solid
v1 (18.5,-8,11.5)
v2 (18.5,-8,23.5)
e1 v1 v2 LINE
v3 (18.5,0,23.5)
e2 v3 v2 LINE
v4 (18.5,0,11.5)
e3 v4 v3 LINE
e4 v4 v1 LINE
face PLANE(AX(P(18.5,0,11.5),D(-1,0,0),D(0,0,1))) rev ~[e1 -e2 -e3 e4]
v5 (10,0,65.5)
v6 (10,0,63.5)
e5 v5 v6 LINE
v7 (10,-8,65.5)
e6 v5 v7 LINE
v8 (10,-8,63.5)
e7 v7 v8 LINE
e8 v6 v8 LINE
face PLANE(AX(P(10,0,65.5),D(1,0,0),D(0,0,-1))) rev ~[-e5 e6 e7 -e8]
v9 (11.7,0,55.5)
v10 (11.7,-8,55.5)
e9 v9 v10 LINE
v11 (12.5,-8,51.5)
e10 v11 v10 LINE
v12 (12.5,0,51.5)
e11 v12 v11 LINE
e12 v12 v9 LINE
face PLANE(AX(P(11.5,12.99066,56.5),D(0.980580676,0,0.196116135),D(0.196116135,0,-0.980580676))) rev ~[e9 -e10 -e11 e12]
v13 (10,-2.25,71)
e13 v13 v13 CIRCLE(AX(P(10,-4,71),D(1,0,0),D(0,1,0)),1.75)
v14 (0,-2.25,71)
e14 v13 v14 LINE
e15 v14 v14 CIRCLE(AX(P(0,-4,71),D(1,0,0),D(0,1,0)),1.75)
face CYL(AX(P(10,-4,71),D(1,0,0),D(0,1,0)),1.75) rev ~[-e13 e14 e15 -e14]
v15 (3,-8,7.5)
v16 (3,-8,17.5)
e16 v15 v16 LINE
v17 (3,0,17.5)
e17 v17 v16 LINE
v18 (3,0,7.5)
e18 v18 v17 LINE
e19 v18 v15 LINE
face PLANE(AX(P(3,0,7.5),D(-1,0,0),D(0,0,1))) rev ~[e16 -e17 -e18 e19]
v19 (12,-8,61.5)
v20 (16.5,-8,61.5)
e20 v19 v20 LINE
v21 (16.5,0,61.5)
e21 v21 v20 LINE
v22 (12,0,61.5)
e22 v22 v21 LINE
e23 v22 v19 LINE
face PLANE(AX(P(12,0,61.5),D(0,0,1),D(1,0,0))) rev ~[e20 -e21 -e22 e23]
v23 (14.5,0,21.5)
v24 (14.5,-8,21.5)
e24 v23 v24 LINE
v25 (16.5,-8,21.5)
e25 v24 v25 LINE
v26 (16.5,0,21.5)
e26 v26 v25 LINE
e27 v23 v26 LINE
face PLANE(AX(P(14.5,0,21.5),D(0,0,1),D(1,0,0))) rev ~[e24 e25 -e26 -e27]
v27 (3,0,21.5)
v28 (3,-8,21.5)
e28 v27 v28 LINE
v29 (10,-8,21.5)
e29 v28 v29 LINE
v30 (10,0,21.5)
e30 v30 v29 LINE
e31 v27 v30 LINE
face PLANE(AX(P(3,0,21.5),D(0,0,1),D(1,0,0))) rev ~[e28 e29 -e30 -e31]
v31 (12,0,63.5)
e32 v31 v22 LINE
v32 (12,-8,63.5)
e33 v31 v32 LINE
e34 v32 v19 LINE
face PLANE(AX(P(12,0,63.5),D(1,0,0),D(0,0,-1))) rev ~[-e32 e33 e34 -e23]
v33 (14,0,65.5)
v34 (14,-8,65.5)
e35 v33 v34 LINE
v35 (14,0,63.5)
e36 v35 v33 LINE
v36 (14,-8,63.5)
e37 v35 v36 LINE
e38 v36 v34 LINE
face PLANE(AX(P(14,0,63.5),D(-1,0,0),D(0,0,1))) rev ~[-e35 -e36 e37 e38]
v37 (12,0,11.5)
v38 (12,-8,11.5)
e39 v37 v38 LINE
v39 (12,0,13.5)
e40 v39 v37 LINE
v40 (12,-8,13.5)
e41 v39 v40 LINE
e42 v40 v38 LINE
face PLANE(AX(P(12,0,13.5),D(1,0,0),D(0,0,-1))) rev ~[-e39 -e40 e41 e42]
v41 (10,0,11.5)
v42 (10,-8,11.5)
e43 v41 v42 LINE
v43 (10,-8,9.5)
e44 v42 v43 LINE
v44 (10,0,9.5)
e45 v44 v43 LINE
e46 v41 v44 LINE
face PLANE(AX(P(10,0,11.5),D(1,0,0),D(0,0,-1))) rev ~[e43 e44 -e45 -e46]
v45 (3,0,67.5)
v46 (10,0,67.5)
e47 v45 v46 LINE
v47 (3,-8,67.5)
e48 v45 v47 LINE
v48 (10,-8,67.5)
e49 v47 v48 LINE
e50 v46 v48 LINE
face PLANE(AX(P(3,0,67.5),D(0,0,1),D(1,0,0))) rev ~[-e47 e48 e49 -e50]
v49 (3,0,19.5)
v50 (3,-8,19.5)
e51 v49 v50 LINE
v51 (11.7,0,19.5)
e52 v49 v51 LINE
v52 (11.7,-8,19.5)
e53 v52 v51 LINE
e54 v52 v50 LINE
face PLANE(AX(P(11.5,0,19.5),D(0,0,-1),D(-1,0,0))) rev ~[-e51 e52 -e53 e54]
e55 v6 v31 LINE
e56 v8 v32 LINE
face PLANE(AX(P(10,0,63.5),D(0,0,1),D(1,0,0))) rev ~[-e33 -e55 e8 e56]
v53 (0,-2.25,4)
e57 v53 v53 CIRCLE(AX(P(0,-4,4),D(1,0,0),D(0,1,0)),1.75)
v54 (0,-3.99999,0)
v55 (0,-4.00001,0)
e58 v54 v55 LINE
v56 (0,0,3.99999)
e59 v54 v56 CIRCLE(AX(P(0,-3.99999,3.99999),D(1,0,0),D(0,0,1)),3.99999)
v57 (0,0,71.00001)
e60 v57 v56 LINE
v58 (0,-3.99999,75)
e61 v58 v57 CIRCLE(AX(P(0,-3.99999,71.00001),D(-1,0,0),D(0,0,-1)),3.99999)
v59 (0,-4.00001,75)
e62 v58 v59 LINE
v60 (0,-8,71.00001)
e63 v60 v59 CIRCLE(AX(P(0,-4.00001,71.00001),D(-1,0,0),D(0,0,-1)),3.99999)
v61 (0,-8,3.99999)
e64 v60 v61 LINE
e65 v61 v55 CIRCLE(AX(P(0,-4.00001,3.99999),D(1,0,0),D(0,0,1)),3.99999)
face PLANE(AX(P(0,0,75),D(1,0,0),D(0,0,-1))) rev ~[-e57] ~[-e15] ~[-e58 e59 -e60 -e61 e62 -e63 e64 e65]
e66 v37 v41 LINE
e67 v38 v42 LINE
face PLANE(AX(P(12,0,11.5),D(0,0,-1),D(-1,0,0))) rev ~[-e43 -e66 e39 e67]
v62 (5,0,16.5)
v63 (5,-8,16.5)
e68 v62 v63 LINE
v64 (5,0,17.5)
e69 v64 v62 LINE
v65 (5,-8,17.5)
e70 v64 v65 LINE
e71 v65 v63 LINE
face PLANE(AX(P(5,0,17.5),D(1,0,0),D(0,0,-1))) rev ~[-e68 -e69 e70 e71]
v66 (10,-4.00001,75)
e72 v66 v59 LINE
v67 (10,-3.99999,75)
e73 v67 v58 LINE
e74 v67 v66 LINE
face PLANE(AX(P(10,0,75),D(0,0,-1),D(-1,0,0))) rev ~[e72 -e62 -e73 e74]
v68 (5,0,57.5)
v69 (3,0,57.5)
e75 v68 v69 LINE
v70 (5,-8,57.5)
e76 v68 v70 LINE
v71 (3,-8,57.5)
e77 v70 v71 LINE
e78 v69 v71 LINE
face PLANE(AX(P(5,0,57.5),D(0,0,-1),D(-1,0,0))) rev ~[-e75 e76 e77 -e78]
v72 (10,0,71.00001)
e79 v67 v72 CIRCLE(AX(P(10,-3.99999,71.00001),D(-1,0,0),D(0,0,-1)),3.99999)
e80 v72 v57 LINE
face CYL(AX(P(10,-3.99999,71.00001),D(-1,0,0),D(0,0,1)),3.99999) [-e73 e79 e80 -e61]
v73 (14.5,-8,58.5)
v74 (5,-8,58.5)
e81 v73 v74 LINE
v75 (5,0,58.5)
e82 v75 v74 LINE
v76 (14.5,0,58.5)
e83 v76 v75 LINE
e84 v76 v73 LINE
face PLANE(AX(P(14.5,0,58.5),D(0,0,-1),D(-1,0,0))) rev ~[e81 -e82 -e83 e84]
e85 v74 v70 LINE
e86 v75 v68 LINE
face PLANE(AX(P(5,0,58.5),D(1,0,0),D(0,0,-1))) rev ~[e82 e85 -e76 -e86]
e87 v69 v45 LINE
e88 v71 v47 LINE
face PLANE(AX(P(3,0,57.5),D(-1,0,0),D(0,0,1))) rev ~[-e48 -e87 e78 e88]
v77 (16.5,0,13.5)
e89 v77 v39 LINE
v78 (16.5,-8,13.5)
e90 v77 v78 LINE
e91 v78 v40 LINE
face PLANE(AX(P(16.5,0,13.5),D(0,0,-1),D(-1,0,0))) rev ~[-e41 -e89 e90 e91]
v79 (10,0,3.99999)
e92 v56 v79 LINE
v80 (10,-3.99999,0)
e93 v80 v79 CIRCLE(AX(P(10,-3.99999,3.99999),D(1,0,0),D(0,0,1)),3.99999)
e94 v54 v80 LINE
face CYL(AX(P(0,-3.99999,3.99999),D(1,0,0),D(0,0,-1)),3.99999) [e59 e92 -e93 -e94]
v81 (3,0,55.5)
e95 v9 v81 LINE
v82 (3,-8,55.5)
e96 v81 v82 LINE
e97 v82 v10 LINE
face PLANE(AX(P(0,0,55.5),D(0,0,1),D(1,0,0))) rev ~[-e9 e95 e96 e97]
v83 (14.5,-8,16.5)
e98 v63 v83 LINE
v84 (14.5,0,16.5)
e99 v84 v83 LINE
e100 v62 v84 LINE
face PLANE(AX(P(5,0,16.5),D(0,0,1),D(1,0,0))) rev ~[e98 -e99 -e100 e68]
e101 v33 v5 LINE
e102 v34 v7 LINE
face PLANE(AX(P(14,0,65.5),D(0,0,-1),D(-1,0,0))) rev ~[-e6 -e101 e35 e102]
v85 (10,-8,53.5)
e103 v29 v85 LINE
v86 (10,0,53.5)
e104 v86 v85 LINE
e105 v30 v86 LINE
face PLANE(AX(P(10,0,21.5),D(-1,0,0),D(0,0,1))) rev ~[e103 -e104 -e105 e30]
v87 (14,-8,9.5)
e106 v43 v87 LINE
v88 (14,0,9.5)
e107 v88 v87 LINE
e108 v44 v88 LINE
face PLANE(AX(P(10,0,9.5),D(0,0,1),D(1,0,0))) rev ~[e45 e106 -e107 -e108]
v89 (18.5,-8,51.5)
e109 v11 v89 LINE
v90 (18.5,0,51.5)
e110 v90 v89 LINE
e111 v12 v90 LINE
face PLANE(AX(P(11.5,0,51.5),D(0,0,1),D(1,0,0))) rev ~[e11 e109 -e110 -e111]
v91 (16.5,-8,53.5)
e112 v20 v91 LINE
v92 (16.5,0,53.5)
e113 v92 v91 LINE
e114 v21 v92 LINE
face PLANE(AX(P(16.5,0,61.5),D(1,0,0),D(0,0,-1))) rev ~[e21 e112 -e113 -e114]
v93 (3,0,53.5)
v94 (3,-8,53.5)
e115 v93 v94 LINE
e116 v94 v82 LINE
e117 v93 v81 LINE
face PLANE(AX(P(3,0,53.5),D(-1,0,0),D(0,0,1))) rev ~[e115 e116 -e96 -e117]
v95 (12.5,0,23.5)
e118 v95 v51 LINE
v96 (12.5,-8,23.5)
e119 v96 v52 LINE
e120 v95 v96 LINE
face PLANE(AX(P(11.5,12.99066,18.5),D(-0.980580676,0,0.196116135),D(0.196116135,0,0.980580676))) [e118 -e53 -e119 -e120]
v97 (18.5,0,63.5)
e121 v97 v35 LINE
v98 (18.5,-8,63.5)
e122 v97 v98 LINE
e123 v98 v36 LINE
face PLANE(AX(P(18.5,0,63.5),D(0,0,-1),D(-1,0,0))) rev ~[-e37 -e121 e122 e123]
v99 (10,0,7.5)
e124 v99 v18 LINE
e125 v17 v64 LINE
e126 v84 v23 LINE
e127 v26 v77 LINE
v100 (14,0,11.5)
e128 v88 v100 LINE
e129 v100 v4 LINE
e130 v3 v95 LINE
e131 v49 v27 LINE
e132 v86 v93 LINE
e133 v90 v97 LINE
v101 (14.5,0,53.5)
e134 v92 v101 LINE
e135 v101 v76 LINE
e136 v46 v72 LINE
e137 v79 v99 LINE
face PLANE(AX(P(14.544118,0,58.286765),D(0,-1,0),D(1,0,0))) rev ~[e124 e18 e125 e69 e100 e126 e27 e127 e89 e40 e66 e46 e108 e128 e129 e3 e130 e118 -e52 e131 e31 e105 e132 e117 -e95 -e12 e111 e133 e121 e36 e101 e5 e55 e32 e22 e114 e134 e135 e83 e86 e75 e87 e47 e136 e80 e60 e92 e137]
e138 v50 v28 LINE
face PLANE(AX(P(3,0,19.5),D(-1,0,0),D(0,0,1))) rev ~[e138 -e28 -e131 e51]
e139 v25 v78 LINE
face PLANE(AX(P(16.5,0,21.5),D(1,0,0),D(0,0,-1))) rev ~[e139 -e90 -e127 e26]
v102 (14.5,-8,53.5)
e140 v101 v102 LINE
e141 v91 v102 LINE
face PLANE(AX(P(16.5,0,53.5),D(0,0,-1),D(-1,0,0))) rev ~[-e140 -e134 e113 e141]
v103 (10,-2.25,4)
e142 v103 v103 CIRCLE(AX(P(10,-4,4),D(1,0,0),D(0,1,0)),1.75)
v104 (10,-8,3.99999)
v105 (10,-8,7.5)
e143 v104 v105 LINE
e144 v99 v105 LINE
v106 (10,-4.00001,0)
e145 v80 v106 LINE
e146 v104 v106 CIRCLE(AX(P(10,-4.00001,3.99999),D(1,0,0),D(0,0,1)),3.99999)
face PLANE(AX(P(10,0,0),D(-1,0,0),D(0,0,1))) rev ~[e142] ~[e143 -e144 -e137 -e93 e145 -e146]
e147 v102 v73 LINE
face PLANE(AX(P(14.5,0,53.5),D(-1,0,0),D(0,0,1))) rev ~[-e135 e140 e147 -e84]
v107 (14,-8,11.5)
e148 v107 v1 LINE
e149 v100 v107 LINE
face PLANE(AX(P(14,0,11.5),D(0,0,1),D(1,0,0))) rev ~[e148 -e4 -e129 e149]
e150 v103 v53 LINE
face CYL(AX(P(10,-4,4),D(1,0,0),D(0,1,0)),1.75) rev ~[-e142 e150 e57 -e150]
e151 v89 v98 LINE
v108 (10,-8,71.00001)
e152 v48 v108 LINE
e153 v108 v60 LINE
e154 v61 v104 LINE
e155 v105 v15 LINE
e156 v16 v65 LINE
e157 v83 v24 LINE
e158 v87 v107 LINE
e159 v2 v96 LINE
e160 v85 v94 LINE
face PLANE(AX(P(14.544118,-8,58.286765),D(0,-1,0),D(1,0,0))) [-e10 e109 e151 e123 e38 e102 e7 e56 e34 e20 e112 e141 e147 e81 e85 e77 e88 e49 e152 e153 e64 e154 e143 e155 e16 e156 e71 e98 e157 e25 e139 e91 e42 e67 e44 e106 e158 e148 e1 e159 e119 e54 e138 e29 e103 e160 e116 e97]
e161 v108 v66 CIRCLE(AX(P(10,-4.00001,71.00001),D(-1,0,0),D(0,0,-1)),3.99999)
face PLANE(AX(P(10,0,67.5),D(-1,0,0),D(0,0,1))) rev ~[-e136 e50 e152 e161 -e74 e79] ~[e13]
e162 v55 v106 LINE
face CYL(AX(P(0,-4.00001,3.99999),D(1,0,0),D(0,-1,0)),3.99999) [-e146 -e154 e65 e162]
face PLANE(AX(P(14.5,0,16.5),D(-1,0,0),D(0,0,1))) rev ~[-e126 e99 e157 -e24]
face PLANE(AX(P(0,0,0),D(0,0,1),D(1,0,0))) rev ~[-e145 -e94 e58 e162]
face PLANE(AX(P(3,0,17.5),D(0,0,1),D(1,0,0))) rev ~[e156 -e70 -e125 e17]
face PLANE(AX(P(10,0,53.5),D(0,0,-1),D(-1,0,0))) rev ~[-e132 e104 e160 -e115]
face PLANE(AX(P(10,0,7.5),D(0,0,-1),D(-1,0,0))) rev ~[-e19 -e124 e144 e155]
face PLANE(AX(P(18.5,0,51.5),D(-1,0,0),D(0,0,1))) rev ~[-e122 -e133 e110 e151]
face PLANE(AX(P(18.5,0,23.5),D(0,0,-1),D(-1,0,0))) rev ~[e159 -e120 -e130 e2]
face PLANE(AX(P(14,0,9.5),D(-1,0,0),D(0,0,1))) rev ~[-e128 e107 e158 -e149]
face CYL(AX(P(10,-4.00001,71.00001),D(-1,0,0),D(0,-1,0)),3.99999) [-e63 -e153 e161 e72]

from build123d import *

# Parameters (mm, degrees)
F1_DEPTH    = 8
F2_T4_DEPTH = 33.981320863
F3_T4_DEPTH = 33.981320863
F4_R        = 3.99999
F5_R        = 1.75
F6_DEPTH    = 10
F7_R        = 1.75
F8_DEPTH    = 10


# Not quite as in the source:
# - a fillet or chamfer that OpenCascade refuses, or shapes differently, is made with other operations: its cross-section is extruded or revolved along the edge and cut away or added
# - a fillet or chamfer is up to 0.001 mm smaller than in the source, because OpenCascade refuses the exact size


with BuildPart() as f1:
    # F0 (on Front) → F1 (new body)
    with BuildSketch(Plane.XZ):
        Polygon((14, 65.5), (10, 65.5), (10, 63.5), (12, 63.5), (12, 61.5), (16.5, 61.5), (16.5, 58.5), (16.5, 53.5), (14.5, 53.5), (14.5, 58.5), (10, 58.5), (10, 55.5), (11.5, 55.5), (11.5, 51.5), (18.5, 51.5), (18.5, 63.5), (14, 63.5), align=None)
        Polygon((10, 11.5), (10, 9.5), (14, 9.5), (14, 11.5), (18.5, 11.5), (18.5, 23.5), (11.5, 23.5), (11.5, 19.5), (10, 19.5), (10, 16.5), (14.5, 16.5), (14.5, 21.5), (16.5, 21.5), (16.5, 16.5), (16.5, 13.5), (12, 13.5), (12, 11.5), align=None)
        Polygon((0, 75), (0, 0), (10, 0), (10, 7.5), (3, 7.5), (3, 9.5), (3, 13.5), (3, 16.5), (3, 17.5), (5, 17.5), (5, 16.5), (10, 16.5), (10, 19.5), (3, 19.5), (3, 21.5), (10, 21.5), (10, 53.5), (3, 53.5), (3, 55.5), (10, 55.5), (10, 58.5), (5, 58.5), (5, 57.5), (3, 57.5), (3, 58.5), (3, 61.5), (3, 65.5), (3, 67.5), (10, 67.5), (10, 75), align=None)
    extrude(amount=F1_DEPTH)

    # F2: chamfer of 1 x 5 on 1 edges, made by hand


with BuildPart() as f2_tool2:
    # F2_s3 → F2_t4 (new body)
    with BuildSketch(Plane.XZ.offset(-12.9906604315)):
        Polygon((11.5, 56.5), (12.5, 51.5), (11.5, 51.5), align=None)
    extrude(amount=F2_T4_DEPTH)

    split(bisect_by=Plane.XY.offset(55.5), keep=Keep.BOTTOM)


with BuildPart() as f1_1:
    add(f1.part)

    # F2_t1: cut F2_tool2
    add(f2_tool2.part, mode=Mode.SUBTRACT)

    # F3: chamfer of 5 x 1 on 1 edges, made by hand


with BuildPart() as f3_tool2:
    # F3_s3 → F3_t4 (new body)
    with BuildSketch(Plane.XZ.offset(-12.9906604315)):
        Polygon((11.5, 18.5), (12.5, 23.5), (11.5, 23.5), align=None)
    extrude(amount=F3_T4_DEPTH)

    split(bisect_by=Plane.XY.offset(19.5), keep=Keep.TOP)


with BuildPart() as f1_2:
    add(f1_1.part)

    # F3_t1: cut F3_tool2
    add(f3_tool2.part, mode=Mode.SUBTRACT)

    # F4 (radius 4 in the source; OpenCascade refuses exactly that, so slightly less here)
    f4_edges = [f1_2.edges().sort_by_distance(p)[0] for p in [
        (5, -8, 75),
        (5, 0, 75),
        (5, -8, 0),
        (5, 0, 0),
    ]]
    fillet(f4_edges, radius=F4_R)

    # F5 (on face) → F6 (cut)
    with BuildSketch(Plane.YZ.offset(10)):
        with Locations((-4, 71)):
            Circle(F5_R)
    extrude(amount=-F6_DEPTH, mode=Mode.SUBTRACT)

    # F7 (on face) → F8 (cut)
    with BuildSketch(Plane.YZ.offset(10)):
        with Locations((-4, 4)):
            Circle(F7_R)
    extrude(amount=-F8_DEPTH, mode=Mode.SUBTRACT)


solid = f1_2.part
